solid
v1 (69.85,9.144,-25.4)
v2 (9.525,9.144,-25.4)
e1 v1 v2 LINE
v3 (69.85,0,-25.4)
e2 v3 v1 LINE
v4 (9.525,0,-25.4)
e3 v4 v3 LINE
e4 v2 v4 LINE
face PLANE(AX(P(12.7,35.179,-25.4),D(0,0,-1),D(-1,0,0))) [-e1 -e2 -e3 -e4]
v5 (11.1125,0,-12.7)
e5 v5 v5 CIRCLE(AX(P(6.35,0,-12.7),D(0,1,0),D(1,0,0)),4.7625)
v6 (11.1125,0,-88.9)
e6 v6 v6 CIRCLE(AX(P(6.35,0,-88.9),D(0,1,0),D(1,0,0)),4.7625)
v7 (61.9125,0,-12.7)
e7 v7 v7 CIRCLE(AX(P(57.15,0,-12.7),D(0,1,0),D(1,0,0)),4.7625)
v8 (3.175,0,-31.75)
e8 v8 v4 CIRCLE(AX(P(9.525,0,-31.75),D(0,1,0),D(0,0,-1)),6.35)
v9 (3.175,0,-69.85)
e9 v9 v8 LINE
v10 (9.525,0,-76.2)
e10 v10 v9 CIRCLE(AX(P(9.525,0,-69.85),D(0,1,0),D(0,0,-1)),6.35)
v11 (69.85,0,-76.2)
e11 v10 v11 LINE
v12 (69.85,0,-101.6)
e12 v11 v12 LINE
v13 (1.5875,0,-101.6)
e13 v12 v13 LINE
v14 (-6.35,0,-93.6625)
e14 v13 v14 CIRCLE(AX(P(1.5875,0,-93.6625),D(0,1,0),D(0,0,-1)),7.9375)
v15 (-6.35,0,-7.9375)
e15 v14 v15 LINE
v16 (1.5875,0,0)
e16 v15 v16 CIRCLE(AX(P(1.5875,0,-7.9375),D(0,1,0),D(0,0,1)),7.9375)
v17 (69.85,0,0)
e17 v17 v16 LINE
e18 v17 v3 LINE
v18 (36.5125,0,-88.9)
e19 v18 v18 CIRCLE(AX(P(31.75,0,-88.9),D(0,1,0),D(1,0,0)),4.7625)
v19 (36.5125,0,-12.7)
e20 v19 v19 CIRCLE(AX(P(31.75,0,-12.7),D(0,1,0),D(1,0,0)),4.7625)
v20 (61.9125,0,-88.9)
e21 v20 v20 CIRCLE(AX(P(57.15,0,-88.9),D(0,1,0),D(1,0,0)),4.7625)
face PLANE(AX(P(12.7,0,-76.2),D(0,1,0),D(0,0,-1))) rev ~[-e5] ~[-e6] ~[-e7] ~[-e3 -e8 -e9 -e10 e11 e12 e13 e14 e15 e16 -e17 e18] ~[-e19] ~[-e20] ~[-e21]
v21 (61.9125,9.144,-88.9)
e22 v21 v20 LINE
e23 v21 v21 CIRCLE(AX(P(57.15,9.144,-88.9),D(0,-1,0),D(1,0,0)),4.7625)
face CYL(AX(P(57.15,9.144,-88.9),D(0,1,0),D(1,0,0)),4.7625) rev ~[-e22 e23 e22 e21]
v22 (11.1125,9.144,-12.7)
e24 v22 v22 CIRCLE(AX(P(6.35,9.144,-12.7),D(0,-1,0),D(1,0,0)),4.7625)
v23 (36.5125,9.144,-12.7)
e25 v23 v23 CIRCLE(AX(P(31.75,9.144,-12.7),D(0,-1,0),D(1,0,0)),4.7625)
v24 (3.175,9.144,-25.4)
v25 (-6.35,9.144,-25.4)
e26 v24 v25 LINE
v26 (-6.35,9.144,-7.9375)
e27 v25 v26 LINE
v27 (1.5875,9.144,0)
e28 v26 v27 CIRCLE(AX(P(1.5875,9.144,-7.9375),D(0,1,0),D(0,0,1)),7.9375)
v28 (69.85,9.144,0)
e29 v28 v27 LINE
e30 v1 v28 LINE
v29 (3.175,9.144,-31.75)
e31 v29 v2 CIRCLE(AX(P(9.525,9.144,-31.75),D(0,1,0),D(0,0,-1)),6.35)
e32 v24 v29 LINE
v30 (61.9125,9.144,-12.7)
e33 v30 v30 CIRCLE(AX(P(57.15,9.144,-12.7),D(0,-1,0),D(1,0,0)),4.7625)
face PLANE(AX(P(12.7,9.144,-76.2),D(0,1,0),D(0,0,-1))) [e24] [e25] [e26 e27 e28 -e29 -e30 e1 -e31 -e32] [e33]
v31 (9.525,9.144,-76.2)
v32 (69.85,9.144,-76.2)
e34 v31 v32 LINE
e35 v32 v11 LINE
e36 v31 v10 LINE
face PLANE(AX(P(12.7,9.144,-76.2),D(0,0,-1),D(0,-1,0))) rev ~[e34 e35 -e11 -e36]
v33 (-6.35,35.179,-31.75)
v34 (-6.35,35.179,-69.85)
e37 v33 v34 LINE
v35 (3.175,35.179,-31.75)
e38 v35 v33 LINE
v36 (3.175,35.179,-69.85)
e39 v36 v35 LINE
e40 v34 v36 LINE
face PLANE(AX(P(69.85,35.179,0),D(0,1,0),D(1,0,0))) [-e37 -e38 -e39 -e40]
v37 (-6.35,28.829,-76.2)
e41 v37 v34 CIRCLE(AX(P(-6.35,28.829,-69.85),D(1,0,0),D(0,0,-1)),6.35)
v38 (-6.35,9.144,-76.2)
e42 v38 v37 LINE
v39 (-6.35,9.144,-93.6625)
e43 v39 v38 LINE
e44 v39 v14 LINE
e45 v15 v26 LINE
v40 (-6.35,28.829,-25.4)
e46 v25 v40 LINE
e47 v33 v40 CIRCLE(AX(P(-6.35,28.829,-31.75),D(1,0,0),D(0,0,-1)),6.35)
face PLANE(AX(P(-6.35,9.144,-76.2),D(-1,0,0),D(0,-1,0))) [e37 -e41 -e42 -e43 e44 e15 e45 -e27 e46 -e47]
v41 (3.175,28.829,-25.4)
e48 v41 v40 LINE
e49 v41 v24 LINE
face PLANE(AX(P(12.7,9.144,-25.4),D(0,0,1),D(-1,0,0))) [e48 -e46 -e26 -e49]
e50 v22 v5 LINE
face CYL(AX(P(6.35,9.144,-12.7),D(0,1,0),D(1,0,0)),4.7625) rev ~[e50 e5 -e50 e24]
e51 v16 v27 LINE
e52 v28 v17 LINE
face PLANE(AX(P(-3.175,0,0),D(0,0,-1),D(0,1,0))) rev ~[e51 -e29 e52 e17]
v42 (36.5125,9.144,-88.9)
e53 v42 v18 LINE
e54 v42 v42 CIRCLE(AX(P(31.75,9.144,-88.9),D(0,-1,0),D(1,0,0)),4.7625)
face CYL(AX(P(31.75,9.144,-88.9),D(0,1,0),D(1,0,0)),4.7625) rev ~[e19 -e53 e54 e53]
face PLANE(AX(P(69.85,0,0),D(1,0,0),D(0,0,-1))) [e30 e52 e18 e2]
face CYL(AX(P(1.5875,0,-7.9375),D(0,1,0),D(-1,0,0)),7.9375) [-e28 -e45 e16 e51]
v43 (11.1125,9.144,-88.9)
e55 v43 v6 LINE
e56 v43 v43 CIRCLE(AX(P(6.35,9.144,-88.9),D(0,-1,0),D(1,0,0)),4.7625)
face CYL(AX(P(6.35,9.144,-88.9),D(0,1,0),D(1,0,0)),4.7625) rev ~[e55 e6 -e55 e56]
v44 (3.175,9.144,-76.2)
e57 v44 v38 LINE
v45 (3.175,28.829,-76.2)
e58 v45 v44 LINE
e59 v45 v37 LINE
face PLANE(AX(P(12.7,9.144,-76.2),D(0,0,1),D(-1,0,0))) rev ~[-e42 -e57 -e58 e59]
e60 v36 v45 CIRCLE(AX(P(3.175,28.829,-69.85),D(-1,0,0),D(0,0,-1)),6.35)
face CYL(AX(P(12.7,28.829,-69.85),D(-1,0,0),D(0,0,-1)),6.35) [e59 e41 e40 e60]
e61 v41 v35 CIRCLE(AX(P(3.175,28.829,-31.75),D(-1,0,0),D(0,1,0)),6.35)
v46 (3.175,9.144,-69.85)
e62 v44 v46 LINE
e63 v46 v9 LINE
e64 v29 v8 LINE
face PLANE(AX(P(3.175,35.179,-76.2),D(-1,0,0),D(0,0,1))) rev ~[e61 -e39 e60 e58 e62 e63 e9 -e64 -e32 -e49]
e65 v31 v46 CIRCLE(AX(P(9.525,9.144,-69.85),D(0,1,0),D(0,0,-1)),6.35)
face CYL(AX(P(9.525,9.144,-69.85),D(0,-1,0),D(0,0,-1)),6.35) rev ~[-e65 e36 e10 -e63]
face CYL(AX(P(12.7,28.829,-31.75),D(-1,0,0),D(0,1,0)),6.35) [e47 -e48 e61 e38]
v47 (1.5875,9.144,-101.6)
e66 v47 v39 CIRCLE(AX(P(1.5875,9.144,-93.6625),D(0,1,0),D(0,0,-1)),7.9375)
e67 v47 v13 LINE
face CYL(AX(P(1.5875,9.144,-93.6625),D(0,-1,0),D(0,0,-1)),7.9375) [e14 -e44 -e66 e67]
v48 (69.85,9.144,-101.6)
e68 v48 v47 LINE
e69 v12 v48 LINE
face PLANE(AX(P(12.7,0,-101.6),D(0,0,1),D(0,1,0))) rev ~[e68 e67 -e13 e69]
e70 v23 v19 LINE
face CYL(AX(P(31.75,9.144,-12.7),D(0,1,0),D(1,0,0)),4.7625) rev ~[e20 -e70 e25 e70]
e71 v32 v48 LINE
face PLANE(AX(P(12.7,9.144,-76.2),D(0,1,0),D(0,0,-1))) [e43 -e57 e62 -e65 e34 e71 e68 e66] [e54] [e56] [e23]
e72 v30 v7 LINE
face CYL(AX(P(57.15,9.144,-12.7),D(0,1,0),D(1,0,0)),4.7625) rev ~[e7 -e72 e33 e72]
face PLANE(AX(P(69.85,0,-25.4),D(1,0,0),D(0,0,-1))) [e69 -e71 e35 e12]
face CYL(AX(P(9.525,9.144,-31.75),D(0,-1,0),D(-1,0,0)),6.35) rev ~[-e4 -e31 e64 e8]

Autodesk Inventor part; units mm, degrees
ref_plane "YZ Plane" through (0, 0, 0) normal (1, 0, 0) x (0, 1, 0)
ref_plane "XZ Plane" through (0, 0, 0) normal (0, 1, 0) x (-1, 0, 0)
ref_plane "XY Plane" through (0, 0, 0) normal (0, 0, 1) x (1, 0, 0)
sketch "Sketch1" plane through (0, 0, 0) normal (1, 0, 0) x (0, 1, 0)
  line L0 (0, 0) -> (9.144, 0)
  line L1 (9.144, 0) -> (9.144, -25.4)
  line L2 (9.144, -25.4) -> (0, -25.4)
  line L3 (0, -25.4) -> (0, 0)
  dimension "d0" = 25.4
  dimension "d1" = 9.144
extrude "Extrusion1" add sketch "Sketch1" along normal blind 63.5
sketch "Sketch2" plane through (0, 9.144, 0) normal (0, 1, 0) x (1, 0, 0)
  line L0 (0, 25.4) -> (0, 0) projected
  line L1 (0, 12.7) -> (6.35, 12.7)
  line L2 (6.35, 12.7) -> (31.75, 12.7)
  line L3 (31.75, 12.7) -> (57.15, 12.7)
  circle A0 centre (6.35, 12.7) radius 4.7625
  circle A1 centre (31.75, 12.7) radius 4.7625
  circle A2 centre (57.15, 12.7) radius 4.7625
  dimension "d4" = 6.35
  dimension "d5" = 25.4
  dimension "d6" = 25.4
  dimension "d7" = 9.525
  dimension "d8" = 9.525
  dimension "d9" = 9.525
sketch "Sketch3" plane through (0, 0, 0) normal (-1, 0, 0) x (0, 0, 1)
  line L0 (-25.4, 0) -> (-25.4, 9.144) projected
  line L1 (0, 0) -> (-25.4, 0)
  line L2 (-25.4, 0) -> (-25.4, 9.144)
  line L3 (-25.4, 9.144) -> (0, 9.144)
  line L4 (0, 9.144) -> (0, 0)
extrude "Extrusion2" add sketch "Sketch3" along normal blind 3.175
extrude "Extrusion3" cut sketch "Sketch2" against normal blind 25.4
sketch "Sketch4" plane through (63.5, 0, 0) normal (1, 0, 0) x (0, 0, -1)
  line L0 (25.4, 0) -> (25.4, 9.144) projected
  line L1 (25.4, 9.144) -> (0, 9.144) projected
  line L2 (0, 9.144) -> (0, 0) projected
  line L3 (0, 0) -> (25.4, 0) projected
extrude "Extrusion4" add sketch "Sketch4" along normal blind 5.08
sketch "Sketch5" plane through (68.58, 0, 0) normal (1, 0, 0) x (0, 0, -1)
  line L0 (25.4, 9.144) -> (0, 9.144) projected
  line L1 (0, 9.144) -> (0, 0) projected
  line L2 (0, 0) -> (25.4, 0) projected
  line L3 (25.4, 0) -> (25.4, 9.144) projected
extrude "Extrusion5" add sketch "Sketch5" along normal blind 1.27
sketch "Sketch8" plane through (-3.175, 0, -25.4) normal (0, 0, -1) x (-1, 0, 0)
  line L0 (-73.025, 0) -> (0, 0) projected
  line L1 (0, 9.144) -> (-73.025, 9.144) projected
  line L2 (0, 0) -> (-15.875, 0)
  line L3 (-15.875, 0) -> (-15.875, 9.144)
  line L4 (-15.875, 9.144) -> (0, 9.144)
  line L5 (0, 9.144) -> (0, 0)
  line L6 (0, 9.144) -> (0, 0) projected
  point P0 (-3.175, 0)
  point P1 (0, 4.572)
  dimension "d24" = 15.875
extrude "Extrusion8" add sketch "Sketch8" along normal blind 50.8
sketch "Sketch9" plane through (-3.175, 0, 0) normal (-1, 0, 0) x (0, 0, 1)
  line L0 (0, 0) -> (0, 9.144) projected
  line L1 (0, 9.144) -> (-76.2, 9.144) projected
  line L2 (-76.2, 0) -> (-76.2, 9.144) projected
  line L3 (0, 0) -> (-76.2, 0) projected
extrude "Extrusion9" add sketch "Sketch9" along normal blind 3.175
sketch "Sketch10" plane through (69.85, 9.144, 0) normal (0, 1, 0) x (1, 0, 0)
  line L0 (-57.15, 25.4) -> (-57.15, 76.2) projected
  line L1 (-57.15, 76.2) -> (-66.675, 76.2)
  line L2 (-57.15, 76.2) -> (-76.2, 76.2) projected
  line L3 (-71.4375, 41.2761) -> (-61.9125, 41.2761)
  line L4 (-71.4375, 60.3261) -> (-61.9125, 60.3261)
  circle A0 centre (-66.675, 41.2761) radius 4.7625
  circle A1 centre (-66.675, 60.3261) radius 4.7625
  line L5 (-71.4375, 41.2761) -> (-71.4375, 60.3261)
  line L6 (-61.9125, 60.3261) -> (-61.9125, 41.2761)
  point P0 (-69.85, 0)
  dimension "d55" = 9.525
  dimension "d29" = 9.525
  dimension "d56" = 9.525
extrude "Extrusion10" add sketch "Sketch10" along normal blind 35.179
sketch "Sketch11" plane through (-3.175, 0, -76.2) normal (0, 0, -1) x (-1, 0, 0)
  line L0 (-15.875, 9.144) -> (3.175, 9.144) projected
  line L1 (-15.875, 9.144) -> (-15.875, 0) projected
  line L2 (-15.875, 0) -> (3.175, 0) projected
  line L3 (3.175, 9.144) -> (3.175, 0) projected
  point P0 (-3.175, 0)
extrude "Extrusion11" add sketch "Sketch11" along normal blind 25.4
sketch "Sketch13" plane through (12.7, 0, -25.4) normal (1, 0, 0) x (0, 0, -1)
  line L0 (0, 9.144) -> (76.2, 9.144) projected
  line L1 (-25.4, 0) -> (76.2, 0) projected
  line L2 (76.2, 9.144) -> (50.8, 9.144)
  line L3 (50.8, 9.144) -> (50.8, 0)
  line L4 (50.8, 0) -> (76.2, 0)
  line L5 (76.2, 0) -> (76.2, 9.144)
  dimension "d38" = 25.4
extrude "Extrusion12" add sketch "Sketch13" along normal blind 57.15
sketch "Sketch14" plane through (69.85, 9.144, 0) normal (0, 1, 0) x (1, 0, 0)
  circle A0 centre (-12.7, 12.7) radius 4.7625 projected
  line L0 (-12.7, 12.7) -> (-12.7, 88.9)
  circle A1 centre (-38.1, 12.7) radius 4.7625 projected
  line L1 (-38.1, 12.7) -> (-38.1, 88.9)
  circle A2 centre (-12.7, 88.9) radius 4.7625
  circle A3 centre (-38.1, 88.9) radius 4.7625
  circle A4 centre (-63.5, 12.7) radius 4.7625 projected
  line L2 (-63.5, 12.7) -> (-63.5, 88.9)
  circle A5 centre (-63.5, 88.9) radius 4.7625
  point P0 (-69.85, 0)
  dimension "d42" = 76.2
  dimension "d43" = 76.2
  dimension "d44" = 9.525
  dimension "d45" = 9.525
  dimension "d46" = 9.525
extrude "Extrusion13" cut sketch "Sketch14" against normal blind 20.6375 contours A2 | A3 | A5
fillet "Fillet2" radius 7.9375 2 edges at (-6.35, 4.572, -101.6) (-6.35, 4.572, 0)
sketch "Sketch15" plane through (69.85, 9.144, 0) normal (0, 1, 0) x (1, 0, 0)
  line L0 (0, 25.4) -> (-57.15, 25.4) projected
  line L1 (-57.15, 25.4) -> (-76.2, 25.4)
  line L2 (-76.2, 7.9375) -> (-76.2, 93.6625) projected
  line L3 (-57.15, 25.4) -> (-57.15, 76.2) projected
  line L4 (-57.15, 76.2) -> (-76.2, 76.2)
  line L5 (-71.4375, 31.7511) -> (-71.4375, 69.8511) projected
  line L6 (-61.9125, 69.8511) -> (-61.9125, 31.7511) projected
  arc A0 (-71.4375, 31.7511) -> (-61.9125, 31.7511) centre (-66.675, 31.7511) ccw projected
  arc A1 (-61.9125, 69.8511) -> (-71.4375, 69.8511) centre (-66.675, 69.8511) ccw projected
  arc A2 (-71.4375, 41.2761) -> (-61.9125, 41.2761) centre (-66.675, 41.2761) ccw projected
  arc A3 (-61.9125, 60.3261) -> (-71.4375, 60.3261) centre (-66.675, 60.3261) ccw projected
  point P0 (-69.85, 0)
extrude "Extrusion14" add sketch "Sketch15" along normal blind 26.035 contours L1 L2 L4 L3 | L5 A2 L6 A0 | L5 A1 L6 A3
fillet "Fillet3" radius 6.35 2 edges at (3.175, 35.179, -76.2) (3.175, 35.179, -25.4)
sketch "Sketch16" plane through (-1.5875, 44.323, -60.3261) normal (-1, 0, 0) x (0, 0, 1)
  arc A0 (-9.5239, -9.144) -> (-15.8739, -15.494) centre (-9.5239, -15.494) ccw projected
  line L0 (-9.5239, -9.144) -> (49.3517, -9.144)
  line L1 (49.3517, -9.144) -> (49.3517, 6.1013)
  line L2 (49.3517, 6.1013) -> (-9.5239, 6.1013)
  line L3 (-9.5239, 6.1013) -> (-9.5239, -9.144)
  point P0 (60.3261, -44.323)
extrude "Extrusion15" cut sketch "Sketch16" against normal blind 21.971
sketch "Sketch19" plane through (69.85, 35.179, 0) normal (0, 1, 0) x (1, 0, 0)
  line L0 (-57.15, 76.2) -> (-76.2, 76.2) projected
  line L1 (-57.15, 25.4) -> (-76.2, 25.4) projected
  line L2 (-57.15, 76.2) -> (-66.675, 76.2)
  line L3 (-66.675, 76.2) -> (-66.675, 25.4)
  line L4 (-66.675, 25.4) -> (-57.15, 25.4)
  line L5 (-57.15, 25.4) -> (-57.15, 76.2)
  line L6 (-57.15, 76.2) -> (-49.094, 76.2)
  line L7 (-49.094, 76.2) -> (-49.094, 25.4)
  line L8 (-49.094, 25.4) -> (-57.15, 25.4)
  line L9 (-57.15, 25.4) -> (-57.15, 76.2)
  point P0 (-69.85, 0)
extrude "Extrusion18" cut sketch "Sketch19" against normal blind 42.8625
fillet "Fillet8" radius 6.35 2 edges at (3.175, 4.572, -76.2) (3.175, 4.572, -25.4)
properties part number "CH-1-03-RearGearboxSpacer_01"
